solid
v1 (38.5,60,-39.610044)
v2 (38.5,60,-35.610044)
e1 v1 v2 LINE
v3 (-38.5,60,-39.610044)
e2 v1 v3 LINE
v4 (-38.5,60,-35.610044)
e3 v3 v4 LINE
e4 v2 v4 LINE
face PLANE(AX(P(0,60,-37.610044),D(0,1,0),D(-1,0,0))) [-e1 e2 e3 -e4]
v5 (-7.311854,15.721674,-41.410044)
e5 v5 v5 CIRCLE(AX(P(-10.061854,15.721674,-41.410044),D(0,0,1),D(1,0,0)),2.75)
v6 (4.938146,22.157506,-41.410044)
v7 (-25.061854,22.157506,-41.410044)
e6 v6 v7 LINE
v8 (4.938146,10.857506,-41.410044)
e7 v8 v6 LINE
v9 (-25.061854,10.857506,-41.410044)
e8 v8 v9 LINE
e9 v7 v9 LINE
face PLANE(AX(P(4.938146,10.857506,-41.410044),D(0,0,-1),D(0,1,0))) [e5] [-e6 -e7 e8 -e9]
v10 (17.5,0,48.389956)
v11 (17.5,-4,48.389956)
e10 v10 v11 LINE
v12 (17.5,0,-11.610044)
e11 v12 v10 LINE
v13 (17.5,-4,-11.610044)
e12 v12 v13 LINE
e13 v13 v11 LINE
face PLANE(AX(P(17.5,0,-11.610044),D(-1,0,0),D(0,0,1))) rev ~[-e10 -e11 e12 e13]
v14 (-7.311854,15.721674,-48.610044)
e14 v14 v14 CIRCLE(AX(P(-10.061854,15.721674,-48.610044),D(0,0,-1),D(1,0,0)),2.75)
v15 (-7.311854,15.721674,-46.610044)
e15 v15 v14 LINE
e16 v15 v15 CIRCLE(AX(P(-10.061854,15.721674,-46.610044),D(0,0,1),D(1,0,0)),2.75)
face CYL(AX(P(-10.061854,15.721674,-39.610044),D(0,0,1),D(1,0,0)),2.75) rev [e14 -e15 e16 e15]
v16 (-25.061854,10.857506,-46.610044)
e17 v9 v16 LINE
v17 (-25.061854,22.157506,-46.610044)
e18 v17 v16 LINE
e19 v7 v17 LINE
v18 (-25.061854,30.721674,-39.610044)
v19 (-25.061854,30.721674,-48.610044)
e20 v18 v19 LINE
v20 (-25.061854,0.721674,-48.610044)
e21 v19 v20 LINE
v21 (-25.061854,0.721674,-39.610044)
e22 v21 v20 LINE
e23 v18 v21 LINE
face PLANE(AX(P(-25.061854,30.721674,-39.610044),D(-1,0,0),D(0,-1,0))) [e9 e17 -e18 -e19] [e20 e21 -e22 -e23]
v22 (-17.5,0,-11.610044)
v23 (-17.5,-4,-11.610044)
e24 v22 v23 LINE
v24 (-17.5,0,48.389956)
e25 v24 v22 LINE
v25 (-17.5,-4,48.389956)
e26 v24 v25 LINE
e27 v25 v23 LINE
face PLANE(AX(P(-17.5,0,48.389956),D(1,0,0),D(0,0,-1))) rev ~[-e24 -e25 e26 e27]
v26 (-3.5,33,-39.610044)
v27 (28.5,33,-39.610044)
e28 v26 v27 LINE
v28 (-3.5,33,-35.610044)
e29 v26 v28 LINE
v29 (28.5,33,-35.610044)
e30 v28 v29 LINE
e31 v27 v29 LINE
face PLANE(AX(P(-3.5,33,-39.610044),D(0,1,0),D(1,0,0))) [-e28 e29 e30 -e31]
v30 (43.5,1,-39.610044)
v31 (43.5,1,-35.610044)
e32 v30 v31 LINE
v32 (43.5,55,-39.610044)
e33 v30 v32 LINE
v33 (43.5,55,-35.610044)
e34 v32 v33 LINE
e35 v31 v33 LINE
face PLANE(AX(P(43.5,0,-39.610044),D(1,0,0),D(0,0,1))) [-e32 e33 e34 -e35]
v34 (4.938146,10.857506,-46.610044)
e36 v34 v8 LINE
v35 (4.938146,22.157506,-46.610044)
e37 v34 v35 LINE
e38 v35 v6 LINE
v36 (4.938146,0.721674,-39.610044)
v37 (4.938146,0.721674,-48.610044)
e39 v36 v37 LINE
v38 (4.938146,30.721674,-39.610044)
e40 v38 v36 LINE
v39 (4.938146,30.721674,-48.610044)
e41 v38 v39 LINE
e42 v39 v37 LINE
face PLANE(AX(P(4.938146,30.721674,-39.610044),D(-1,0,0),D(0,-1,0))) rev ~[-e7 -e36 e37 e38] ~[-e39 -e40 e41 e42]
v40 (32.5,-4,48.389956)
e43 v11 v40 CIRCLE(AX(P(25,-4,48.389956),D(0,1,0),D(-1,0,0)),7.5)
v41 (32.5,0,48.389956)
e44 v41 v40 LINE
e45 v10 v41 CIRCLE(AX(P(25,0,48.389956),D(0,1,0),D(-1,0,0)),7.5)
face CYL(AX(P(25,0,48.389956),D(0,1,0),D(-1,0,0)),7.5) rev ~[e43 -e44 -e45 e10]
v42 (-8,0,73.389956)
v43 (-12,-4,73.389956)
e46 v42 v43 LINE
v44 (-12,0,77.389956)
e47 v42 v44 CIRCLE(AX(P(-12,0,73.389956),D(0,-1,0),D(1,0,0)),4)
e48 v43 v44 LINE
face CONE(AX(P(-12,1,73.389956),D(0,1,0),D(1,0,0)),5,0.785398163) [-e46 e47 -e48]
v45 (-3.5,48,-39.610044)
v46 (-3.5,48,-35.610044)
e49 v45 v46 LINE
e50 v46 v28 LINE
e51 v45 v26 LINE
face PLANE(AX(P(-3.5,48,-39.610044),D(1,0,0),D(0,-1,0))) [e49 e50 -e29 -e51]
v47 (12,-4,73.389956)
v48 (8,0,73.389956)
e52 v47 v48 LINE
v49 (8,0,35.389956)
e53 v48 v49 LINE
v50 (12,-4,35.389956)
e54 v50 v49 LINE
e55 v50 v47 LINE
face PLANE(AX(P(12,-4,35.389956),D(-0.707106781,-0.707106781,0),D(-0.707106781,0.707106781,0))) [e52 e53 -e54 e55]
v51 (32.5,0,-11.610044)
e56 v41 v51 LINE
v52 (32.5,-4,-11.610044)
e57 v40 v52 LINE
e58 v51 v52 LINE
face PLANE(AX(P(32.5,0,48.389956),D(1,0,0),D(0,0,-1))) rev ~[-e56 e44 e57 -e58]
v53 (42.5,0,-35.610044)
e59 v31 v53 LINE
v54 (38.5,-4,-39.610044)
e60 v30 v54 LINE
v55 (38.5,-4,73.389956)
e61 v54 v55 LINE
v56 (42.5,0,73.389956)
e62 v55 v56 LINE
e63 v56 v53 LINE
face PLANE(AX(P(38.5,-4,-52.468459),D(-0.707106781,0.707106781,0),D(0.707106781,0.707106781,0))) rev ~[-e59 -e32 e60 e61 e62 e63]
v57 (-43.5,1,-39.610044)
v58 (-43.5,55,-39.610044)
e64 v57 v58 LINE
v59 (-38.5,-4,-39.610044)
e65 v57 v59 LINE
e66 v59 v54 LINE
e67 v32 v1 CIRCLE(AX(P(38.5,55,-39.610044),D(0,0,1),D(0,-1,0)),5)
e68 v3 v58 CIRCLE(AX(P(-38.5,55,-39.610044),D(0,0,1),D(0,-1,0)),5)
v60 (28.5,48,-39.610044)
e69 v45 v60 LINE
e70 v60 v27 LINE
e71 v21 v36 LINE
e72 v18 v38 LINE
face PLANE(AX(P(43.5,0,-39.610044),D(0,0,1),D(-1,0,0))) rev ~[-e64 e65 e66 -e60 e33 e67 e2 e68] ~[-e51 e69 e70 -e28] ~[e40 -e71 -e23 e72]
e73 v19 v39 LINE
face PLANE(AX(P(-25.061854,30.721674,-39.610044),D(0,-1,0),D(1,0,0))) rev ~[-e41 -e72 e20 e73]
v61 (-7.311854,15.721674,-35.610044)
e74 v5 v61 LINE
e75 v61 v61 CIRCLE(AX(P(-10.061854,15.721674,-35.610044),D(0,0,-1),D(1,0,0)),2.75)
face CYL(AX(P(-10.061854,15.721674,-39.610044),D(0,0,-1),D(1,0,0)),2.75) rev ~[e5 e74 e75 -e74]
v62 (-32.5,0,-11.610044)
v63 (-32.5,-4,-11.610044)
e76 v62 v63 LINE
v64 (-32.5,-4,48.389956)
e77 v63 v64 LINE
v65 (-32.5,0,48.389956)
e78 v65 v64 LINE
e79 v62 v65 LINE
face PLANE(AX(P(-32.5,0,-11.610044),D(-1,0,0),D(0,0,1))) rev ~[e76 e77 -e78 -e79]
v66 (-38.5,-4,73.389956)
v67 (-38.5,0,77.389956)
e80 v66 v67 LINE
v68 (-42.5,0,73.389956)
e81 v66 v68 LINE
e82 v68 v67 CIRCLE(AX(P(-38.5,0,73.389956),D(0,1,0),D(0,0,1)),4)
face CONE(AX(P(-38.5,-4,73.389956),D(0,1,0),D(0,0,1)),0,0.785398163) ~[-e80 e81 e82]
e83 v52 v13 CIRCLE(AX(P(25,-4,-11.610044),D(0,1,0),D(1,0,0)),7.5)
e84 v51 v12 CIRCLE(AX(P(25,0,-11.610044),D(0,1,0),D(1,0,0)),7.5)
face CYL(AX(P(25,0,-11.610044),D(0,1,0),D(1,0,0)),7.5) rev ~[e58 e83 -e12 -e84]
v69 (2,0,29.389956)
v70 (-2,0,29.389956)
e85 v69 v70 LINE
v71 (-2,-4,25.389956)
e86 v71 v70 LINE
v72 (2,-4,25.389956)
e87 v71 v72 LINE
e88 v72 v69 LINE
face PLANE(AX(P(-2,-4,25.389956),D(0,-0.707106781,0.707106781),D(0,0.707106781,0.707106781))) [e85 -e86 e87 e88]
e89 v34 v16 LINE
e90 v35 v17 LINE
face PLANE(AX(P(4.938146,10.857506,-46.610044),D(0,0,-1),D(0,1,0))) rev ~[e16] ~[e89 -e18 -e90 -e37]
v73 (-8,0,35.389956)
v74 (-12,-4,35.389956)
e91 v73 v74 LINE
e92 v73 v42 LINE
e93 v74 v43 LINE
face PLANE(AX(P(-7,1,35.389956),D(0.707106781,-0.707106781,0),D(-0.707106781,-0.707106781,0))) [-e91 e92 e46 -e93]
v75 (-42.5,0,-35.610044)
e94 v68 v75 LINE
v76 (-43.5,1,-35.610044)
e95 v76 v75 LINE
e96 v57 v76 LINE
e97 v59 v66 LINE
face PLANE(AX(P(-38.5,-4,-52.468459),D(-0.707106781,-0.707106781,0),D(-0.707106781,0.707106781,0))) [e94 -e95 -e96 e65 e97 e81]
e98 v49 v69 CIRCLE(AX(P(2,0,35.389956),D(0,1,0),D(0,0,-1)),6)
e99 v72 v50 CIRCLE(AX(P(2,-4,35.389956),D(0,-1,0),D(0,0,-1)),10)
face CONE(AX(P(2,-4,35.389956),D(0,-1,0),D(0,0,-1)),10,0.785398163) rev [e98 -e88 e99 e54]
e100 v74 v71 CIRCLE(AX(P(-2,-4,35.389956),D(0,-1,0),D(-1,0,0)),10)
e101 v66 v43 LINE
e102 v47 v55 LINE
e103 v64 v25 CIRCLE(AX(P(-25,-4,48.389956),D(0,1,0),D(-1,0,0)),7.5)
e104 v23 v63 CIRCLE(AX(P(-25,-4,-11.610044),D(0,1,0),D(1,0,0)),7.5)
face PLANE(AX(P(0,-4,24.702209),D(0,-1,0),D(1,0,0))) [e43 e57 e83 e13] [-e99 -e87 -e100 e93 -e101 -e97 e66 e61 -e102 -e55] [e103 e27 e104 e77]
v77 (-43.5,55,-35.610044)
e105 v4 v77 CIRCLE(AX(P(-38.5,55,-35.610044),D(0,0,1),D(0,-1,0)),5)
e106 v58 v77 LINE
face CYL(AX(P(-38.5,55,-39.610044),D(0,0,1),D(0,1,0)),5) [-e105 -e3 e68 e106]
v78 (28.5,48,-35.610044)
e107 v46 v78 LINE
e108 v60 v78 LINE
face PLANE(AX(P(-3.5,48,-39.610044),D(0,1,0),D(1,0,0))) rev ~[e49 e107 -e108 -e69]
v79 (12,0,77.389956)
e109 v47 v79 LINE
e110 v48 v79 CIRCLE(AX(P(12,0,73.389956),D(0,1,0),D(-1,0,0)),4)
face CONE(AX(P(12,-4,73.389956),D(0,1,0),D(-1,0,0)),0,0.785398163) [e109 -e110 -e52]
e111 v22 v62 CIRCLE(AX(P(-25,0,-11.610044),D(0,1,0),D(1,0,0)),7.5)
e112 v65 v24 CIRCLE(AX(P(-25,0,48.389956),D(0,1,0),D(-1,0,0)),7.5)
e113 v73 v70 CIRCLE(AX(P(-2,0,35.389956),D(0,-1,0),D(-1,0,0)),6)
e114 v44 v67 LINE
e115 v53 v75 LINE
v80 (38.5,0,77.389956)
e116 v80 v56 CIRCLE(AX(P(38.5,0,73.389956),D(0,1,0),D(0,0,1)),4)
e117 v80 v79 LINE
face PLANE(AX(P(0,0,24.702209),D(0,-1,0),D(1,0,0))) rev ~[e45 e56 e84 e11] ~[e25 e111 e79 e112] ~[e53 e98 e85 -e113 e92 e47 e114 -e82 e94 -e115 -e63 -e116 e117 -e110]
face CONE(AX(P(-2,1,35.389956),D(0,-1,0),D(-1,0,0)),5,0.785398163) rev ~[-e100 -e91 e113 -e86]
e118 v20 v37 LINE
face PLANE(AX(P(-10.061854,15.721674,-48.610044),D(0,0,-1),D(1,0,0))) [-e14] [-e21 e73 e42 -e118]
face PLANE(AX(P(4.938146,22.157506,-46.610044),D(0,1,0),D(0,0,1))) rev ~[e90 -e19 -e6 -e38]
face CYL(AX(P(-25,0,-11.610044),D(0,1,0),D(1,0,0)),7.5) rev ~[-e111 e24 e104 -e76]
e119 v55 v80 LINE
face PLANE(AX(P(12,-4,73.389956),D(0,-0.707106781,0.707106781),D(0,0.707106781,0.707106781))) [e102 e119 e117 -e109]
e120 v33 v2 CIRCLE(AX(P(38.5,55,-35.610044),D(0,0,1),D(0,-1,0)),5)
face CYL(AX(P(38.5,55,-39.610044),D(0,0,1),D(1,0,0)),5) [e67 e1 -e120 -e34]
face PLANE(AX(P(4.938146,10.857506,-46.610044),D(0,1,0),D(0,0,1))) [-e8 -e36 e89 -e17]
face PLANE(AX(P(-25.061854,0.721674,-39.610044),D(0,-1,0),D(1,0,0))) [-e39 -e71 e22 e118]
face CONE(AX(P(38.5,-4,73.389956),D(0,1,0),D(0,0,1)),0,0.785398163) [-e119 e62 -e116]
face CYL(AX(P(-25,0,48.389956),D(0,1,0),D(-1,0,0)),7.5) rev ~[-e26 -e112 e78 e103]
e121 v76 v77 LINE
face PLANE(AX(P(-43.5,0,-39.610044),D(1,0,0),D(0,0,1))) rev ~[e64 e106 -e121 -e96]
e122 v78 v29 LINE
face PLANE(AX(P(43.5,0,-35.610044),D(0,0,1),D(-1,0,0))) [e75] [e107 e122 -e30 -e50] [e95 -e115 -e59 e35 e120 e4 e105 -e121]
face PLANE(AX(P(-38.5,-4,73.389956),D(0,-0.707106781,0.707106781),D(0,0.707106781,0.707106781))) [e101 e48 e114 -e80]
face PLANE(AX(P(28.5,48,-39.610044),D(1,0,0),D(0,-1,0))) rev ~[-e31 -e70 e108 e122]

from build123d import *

# Parameters (mm, degrees)
F1_DEPTH      = 4
F2_W          = 87
F2_H          = 4
F3_DEPTH      = 60
F4_W          = 32
F4_H          = 15
F5_DEPTH      = 4
F6_R          = 5
F7_W          = 30
F7_H          = 30
F7_R          = 2.75
F8_DEPTH      = 9
F9_DEPTH      = 5
F10_T1_DEPTH  = 26.5
F10_T3_DEPTH  = 125.8584149398
F10_T5_DEPTH  = 38
F10_T7_DEPTH  = 4
F10_T9_DEPTH  = 26.5
F10_T12_ANGLE = 90
F10_T14_ANGLE = 90
F10_T16_ANGLE = 90
F10_T18_ANGLE = 90
F10_T20_ANGLE = 90
F10_T22_ANGLE = 90
F11_W         = 11.3
F11_H         = 5.2
F12_DEPTH     = 30.7


# Not quite as in the source:
# - a fillet or chamfer that OpenCascade refuses, or shapes differently, is made with other operations: its cross-section is extruded or revolved along the edge and cut away or added


with BuildPart() as f1:
    # F0 (on Front) → F1 (new body)
    with BuildSketch(Plane.XZ):
        Polygon((-7, 78.3899563551), (-43.5, 78.3899563551), (-43.5, -39.6100436449), (43.5, -39.6100436449), (43.5, 78.3899563551), (7, 78.3899563551), (7, 30.3899563551), (-7, 30.3899563551), align=None)
        with BuildLine():
            Line((-17.5, 48.3899563551), (-17.5, -11.6100436449))
            ThreePointArc((-17.5, -11.6100436449), (-25, -19.1100436449), (-32.5, -11.6100436449))
            Line((-32.5, -11.6100436449), (-32.5, 48.3899563551))
            ThreePointArc((-32.5, 48.3899563551), (-25, 55.8899563551), (-17.5, 48.3899563551))
        make_face(mode=Mode.SUBTRACT)
        with BuildLine():
            Line((32.5, 48.3899563551), (32.5, -11.6100436449))
            ThreePointArc((32.5, -11.6100436449), (25, -19.1100436449), (17.5, -11.6100436449))
            Line((17.5, -11.6100436449), (17.5, 48.3899563551))
            ThreePointArc((17.5, 48.3899563551), (25, 55.8899563551), (32.5, 48.3899563551))
        make_face(mode=Mode.SUBTRACT)
    extrude(amount=F1_DEPTH)

    # F2 (on face) → F3 (join)
    with BuildSketch(Plane(origin=(0, 0, 0), x_dir=(-1, 0, 0), z_dir=(0, 1, 0))):
        with Locations((0, -37.6100436449)):
            Rectangle(F2_W, F2_H)
    extrude(amount=F3_DEPTH)

    # F4 (on face) → F5 (cut)
    with BuildSketch(Plane(origin=(0, 0, -39.6100436449), x_dir=(1, 0, 0), z_dir=(0, 0, -1))):
        with Locations((12.5, -40.5)):
            Rectangle(F4_W, F4_H)
    extrude(amount=-F5_DEPTH, mode=Mode.SUBTRACT)

    # F6
    f6_edges = [f1.edges().sort_by_distance(p)[0] for p in [
        (-43.5, -2, 78.389956),
        (7, -2, 78.389956),
        (-7, -2, 78.389956),
        (43.5, -2, 78.389956),
        (-43.5, 60, -37.610044),
        (43.5, 60, -37.610044),
        (7, -2, 30.389956),
        (-7, -2, 30.389956),
    ]]
    fillet(f6_edges, radius=F6_R)

    # F7 (on face) → F8 (join)
    with BuildSketch(Plane(origin=(0, 0, -39.6100436449), x_dir=(1, 0, 0), z_dir=(0, 0, -1))):
        with Locations((-10.0618535653, -15.7216744063)):
            Rectangle(F7_W, F7_H)
        with Locations((-10.0618535653, -15.7216744063)):
            Circle(F7_R, mode=Mode.SUBTRACT)
    extrude(amount=F8_DEPTH)

    # F9 (cut): a face of the model
    f9_faces = [f1.faces().sort_by_distance(p)[0] for p in [
        (-10.0618535653, 15.7216744063, -39.6100436449),
    ]]
    extrude(f9_faces, amount=-F9_DEPTH, mode=Mode.SUBTRACT)

    # F10: chamfer of 5 on 1 edges, made by hand

    # F10_s2 → F10_t1 (cut)
    with BuildSketch(Plane.YZ.offset(-38.5)):
        Polygon((-4, 73.3899563551), (1, 78.3899563551), (-4, 78.3899563551), align=None)
    extrude(amount=F10_T1_DEPTH, mode=Mode.SUBTRACT)

    # F10_s4 → F10_t3 (cut)
    with BuildSketch(Plane.XY.offset(-52.4684585847)):
        Polygon((-38.5, -4), (-43.5, 1), (-43.5, -4), align=None)
        Polygon((38.5, -4), (43.5, 1), (43.5, -4), align=None)
    extrude(amount=F10_T3_DEPTH, mode=Mode.SUBTRACT)

    # F10_s6 → F10_t5 (cut)
    with BuildSketch(Plane.XY.offset(35.3899563551)):
        Polygon((-7, 1), (-12, -4), (-7, -4), align=None)
        Polygon((12, -4), (7, 1), (7, -4), align=None)
    extrude(amount=F10_T5_DEPTH, mode=Mode.SUBTRACT)

    # F10_s8 → F10_t7 (cut)
    with BuildSketch(Plane.YZ.offset(-2)):
        Polygon((-4, 25.3899563551), (1, 30.3899563551), (-4, 30.3899563551), align=None)
    extrude(amount=F10_T7_DEPTH, mode=Mode.SUBTRACT)

    # F10_s10 → F10_t9 (cut)
    with BuildSketch(Plane.YZ.offset(12)):
        Polygon((-4, 73.3899563551), (1, 78.3899563551), (-4, 78.3899563551), align=None)
    extrude(amount=F10_T9_DEPTH, mode=Mode.SUBTRACT)

    # F10_s11 → F10_t12 (revolve, cut)
    with BuildSketch(Plane.XY.offset(73.3899563551)):
        Polygon((-7, 1), (-12, -4), (-7, -4), align=None)
    revolve(axis=Axis((-12, -4, 73.3899563551), (0, -1, 0)), revolution_arc=F10_T12_ANGLE, mode=Mode.SUBTRACT)

    # F10_s13 → F10_t14 (revolve, cut)
    with BuildSketch(Plane.YZ.offset(-38.5)):
        Polygon((-4, 73.3899563551), (1, 78.3899563551), (-4, 78.3899563551), align=None)
    revolve(axis=Axis((-38.5, -4, 73.3899563551), (0, -1, 0)), revolution_arc=F10_T14_ANGLE, mode=Mode.SUBTRACT)

    # F10_s15 → F10_t16 (revolve, cut)
    with BuildSketch(Plane.XY.offset(35.3899563551)):
        Polygon((-7, 1), (-12, -4), (-7, -4), align=None)
    revolve(axis=Axis((-2, -4, 35.3899563551), (0, -1, 0)), revolution_arc=F10_T16_ANGLE, mode=Mode.SUBTRACT)

    # F10_s17 → F10_t18 (revolve, cut)
    with BuildSketch(Plane.YZ.offset(2)):
        Polygon((-4, 25.3899563551), (1, 30.3899563551), (-4, 30.3899563551), align=None)
    revolve(axis=Axis((2, -4, 35.3899563551), (0, -1, 0)), revolution_arc=F10_T18_ANGLE, mode=Mode.SUBTRACT)

    # F10_s19 → F10_t20 (revolve, cut)
    with BuildSketch(Plane.XY.offset(73.3899563551)):
        Polygon((12, -4), (7, 1), (7, -4), align=None)
    revolve(axis=Axis((12, -4, 73.3899563551), (0, 1, 0)), revolution_arc=F10_T20_ANGLE, mode=Mode.SUBTRACT)

    # F10_s21 → F10_t22 (revolve, cut)
    with BuildSketch(Plane.YZ.offset(38.5)):
        Polygon((-4, 73.3899563551), (1, 78.3899563551), (-4, 78.3899563551), align=None)
    revolve(axis=Axis((38.5, -4, 73.3899563551), (0, 1, 0)), revolution_arc=F10_T22_ANGLE, mode=Mode.SUBTRACT)

    # F11 (on face) → F12 (cut)
    with BuildSketch(Plane.YZ.offset(4.9381464347)):
        with Locations((16.5075063076, -44.0100436449)):
            Rectangle(F11_W, F11_H)
    extrude(amount=-F12_DEPTH, mode=Mode.SUBTRACT)


solid = f1.part
